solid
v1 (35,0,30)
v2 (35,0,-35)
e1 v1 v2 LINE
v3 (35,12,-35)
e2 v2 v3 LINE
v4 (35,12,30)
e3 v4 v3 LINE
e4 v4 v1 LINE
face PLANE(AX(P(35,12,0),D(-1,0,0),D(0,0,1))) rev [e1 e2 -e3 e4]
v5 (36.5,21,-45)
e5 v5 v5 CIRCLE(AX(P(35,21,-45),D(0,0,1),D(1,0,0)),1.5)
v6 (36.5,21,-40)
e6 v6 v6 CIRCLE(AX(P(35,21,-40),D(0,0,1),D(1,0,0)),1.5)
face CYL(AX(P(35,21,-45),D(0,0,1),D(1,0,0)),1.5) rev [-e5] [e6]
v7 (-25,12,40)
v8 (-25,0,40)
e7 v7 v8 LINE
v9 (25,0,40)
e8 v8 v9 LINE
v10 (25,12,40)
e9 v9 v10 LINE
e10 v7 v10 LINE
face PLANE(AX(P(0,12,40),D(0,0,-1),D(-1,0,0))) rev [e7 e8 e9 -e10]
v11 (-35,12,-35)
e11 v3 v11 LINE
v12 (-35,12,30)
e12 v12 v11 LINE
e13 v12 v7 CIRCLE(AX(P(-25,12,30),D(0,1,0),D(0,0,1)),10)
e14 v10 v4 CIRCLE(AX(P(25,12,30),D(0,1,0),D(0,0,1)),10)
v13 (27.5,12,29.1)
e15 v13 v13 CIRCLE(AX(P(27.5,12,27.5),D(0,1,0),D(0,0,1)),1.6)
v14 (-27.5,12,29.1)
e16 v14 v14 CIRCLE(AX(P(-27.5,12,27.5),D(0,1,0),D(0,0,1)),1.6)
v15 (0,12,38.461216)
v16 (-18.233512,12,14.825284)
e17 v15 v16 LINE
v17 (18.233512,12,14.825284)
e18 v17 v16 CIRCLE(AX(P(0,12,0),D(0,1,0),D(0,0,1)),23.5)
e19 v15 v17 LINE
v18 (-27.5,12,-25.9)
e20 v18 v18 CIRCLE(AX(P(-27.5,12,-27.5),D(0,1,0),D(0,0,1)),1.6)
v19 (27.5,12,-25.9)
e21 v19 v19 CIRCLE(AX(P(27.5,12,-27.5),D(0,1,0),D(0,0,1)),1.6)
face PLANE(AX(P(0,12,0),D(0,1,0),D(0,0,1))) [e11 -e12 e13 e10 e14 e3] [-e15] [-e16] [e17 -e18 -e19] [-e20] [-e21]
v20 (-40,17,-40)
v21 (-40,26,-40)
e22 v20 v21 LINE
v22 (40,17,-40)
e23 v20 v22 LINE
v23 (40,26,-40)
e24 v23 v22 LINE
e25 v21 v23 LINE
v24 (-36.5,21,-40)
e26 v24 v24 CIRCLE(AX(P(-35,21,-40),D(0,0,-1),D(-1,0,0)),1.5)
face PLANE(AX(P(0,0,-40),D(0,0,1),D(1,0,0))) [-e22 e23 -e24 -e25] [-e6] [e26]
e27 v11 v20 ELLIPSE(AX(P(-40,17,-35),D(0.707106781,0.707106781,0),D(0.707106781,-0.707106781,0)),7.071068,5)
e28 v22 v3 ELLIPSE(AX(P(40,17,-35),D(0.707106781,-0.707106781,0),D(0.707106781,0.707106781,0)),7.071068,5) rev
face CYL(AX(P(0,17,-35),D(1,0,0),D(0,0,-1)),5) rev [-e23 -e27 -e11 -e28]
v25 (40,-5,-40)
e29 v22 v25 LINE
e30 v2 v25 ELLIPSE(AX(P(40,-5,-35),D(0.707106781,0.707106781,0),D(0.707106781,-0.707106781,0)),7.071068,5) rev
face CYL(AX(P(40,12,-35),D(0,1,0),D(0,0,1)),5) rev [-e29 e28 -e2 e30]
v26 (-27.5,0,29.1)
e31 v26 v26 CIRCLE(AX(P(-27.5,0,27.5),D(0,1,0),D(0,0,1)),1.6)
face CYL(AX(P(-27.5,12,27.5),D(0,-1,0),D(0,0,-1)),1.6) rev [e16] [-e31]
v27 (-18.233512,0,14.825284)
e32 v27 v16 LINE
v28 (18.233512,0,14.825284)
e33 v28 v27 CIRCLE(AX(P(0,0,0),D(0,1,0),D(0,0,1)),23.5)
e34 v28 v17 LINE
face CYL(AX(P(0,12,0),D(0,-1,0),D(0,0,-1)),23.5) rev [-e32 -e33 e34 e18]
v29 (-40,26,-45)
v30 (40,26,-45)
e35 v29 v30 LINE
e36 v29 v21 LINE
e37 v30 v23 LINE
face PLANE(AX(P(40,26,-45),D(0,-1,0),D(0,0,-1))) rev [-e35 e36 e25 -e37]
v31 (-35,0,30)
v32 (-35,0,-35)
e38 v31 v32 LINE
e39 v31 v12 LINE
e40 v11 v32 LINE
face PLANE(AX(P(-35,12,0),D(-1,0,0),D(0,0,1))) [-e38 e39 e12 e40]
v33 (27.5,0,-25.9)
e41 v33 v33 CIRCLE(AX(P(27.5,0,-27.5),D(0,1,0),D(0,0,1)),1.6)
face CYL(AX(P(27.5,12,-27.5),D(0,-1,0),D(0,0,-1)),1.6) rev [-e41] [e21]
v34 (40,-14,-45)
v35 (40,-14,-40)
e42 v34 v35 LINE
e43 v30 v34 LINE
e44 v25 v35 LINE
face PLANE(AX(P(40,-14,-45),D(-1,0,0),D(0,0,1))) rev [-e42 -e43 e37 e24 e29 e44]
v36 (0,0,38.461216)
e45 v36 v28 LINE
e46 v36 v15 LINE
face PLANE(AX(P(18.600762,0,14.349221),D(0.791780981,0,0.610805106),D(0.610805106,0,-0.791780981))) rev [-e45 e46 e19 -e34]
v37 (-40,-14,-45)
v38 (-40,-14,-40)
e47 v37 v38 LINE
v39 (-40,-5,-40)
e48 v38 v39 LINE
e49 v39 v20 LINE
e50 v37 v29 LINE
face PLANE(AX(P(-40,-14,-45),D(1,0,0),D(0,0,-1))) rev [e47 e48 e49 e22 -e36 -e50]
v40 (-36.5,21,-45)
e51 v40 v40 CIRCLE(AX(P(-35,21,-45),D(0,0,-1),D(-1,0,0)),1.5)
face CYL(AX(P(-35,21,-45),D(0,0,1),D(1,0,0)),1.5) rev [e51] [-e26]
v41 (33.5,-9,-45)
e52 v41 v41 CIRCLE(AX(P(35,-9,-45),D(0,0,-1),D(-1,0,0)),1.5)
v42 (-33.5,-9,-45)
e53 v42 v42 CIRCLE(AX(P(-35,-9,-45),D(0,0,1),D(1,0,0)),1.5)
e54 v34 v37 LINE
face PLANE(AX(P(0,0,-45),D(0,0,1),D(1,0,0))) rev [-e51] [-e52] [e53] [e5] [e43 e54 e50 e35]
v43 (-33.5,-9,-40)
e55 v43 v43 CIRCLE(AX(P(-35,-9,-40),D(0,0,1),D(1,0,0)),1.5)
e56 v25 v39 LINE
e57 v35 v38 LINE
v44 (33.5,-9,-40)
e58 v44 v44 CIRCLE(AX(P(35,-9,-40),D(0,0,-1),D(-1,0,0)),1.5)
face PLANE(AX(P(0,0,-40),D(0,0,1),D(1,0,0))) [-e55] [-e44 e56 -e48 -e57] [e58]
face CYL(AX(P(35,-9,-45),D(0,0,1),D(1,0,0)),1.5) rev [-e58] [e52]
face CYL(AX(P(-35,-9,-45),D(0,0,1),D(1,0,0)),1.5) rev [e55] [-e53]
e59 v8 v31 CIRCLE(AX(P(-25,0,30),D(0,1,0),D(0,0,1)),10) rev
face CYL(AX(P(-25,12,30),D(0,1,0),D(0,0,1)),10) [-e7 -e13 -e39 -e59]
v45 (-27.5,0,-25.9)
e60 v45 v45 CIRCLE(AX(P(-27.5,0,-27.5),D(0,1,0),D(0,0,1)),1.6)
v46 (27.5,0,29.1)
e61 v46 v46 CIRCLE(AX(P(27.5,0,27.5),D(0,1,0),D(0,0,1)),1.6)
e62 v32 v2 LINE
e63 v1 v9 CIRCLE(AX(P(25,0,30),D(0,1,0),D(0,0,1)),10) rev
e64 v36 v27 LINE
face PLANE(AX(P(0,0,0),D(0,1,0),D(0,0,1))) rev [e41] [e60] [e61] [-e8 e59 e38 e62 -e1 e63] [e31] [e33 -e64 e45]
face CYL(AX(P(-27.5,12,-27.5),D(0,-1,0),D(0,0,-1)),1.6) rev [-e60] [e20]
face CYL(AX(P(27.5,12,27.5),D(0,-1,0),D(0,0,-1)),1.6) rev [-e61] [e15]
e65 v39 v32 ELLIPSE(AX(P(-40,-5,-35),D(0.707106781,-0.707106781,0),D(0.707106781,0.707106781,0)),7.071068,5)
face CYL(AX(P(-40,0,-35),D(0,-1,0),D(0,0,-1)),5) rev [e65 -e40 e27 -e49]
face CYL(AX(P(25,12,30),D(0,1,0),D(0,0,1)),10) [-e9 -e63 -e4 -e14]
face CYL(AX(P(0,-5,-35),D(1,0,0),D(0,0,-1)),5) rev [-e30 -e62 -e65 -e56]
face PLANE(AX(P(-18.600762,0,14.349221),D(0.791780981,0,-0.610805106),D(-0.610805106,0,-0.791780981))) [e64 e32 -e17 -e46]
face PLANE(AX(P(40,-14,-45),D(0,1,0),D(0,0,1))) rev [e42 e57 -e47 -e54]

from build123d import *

# Parameters (mm, degrees)
SKETCH_2_W          = 70
SKETCH_2_H          = 80
SKETCH_2_R          = 23.5
SKETCH_2_R_2        = 1.6
EXTRUDE_4_DEPTH     = 12
SKETCH_6_W          = 80
SKETCH_6_H          = 40
EXTRUDE_6_DEPTH     = 5
FILLET_3_R          = 5
FILLET_4_R          = 5
FILLET_5_R          = 5
FILLET_6_R          = 5
SKETCH_7_R          = 1.5
CUT_EXTRUDE_4_DEPTH = 5
CUT_EXTRUDE_START   = -12
CUT_EXTRUDE_6_DEPTH = 12
FILLET_7_R          = 10
FILLET_8_R          = 10


with BuildPart() as part:
    # 草图2 → 凸台-拉伸4 (new body)
    with BuildSketch(Plane(origin=(0, 0, 0), x_dir=(1, 0, 0), z_dir=(0, 1, 0))):
        Rectangle(SKETCH_2_W, SKETCH_2_H)
        with Locations(Location((0, 0, 0), (0, 0, 270))):
            Circle(SKETCH_2_R, mode=Mode.SUBTRACT)
        with Locations(Location((-27.5, 27.5, 0), (0, 0, 270))):
            Circle(SKETCH_2_R_2, mode=Mode.SUBTRACT)
        with Locations(Location((27.5, 27.5, 0), (0, 0, 270))):
            Circle(SKETCH_2_R_2, mode=Mode.SUBTRACT)
        with Locations(Location((27.5, -27.5, 0), (0, 0, 270))):
            Circle(SKETCH_2_R_2, mode=Mode.SUBTRACT)
        with Locations(Location((-27.5, -27.5, 0), (0, 0, 270))):
            Circle(SKETCH_2_R_2, mode=Mode.SUBTRACT)
    extrude(amount=EXTRUDE_4_DEPTH)

    # 草图6 → 凸台-拉伸6 (add)
    with BuildSketch(Plane(origin=(0, 0, -40), x_dir=(-1, 0, 0), z_dir=(0, 0, -1))):
        with Locations((0, 6)):
            Rectangle(SKETCH_6_W, SKETCH_6_H)
    extrude(amount=EXTRUDE_6_DEPTH)

    # 圆角3
    fillet_3_edges = [part.edges().sort_by_distance(p)[0] for p in [
        (0, 12, -40),
    ]]
    fillet(fillet_3_edges, radius=FILLET_3_R)

    # 圆角4
    fillet_4_edges = [part.edges().sort_by_distance(p)[0] for p in [
        (0, 0, -40),
    ]]
    fillet(fillet_4_edges, radius=FILLET_4_R)

    # 圆角5
    fillet_5_edges = [part.edges().sort_by_distance(p)[0] for p in [
        (35, 6, -40),
    ]]
    fillet(fillet_5_edges, radius=FILLET_5_R - 0.0001)  # a hair under: the kernel refuses the full size

    # 圆角6
    fillet_6_edges = [part.edges().sort_by_distance(p)[0] for p in [
        (-35, 6, -40),
    ]]
    fillet(fillet_6_edges, radius=FILLET_6_R - 0.0001)  # a hair under: the kernel refuses the full size

    # 草图7 → 切除-拉伸4 (cut)
    with BuildSketch(Plane.XY.offset(-40)):
        with Locations((-35, -9)):
            Circle(SKETCH_7_R)
        with Locations(Location((-35, 21, 0), (0, 0, 180))):
            Circle(SKETCH_7_R)
        with Locations(Location((35, -9, 0), (0, 0, 180))):
            Circle(SKETCH_7_R)
        with Locations((35, 21)):
            Circle(SKETCH_7_R)
    extrude(amount=-CUT_EXTRUDE_4_DEPTH, mode=Mode.SUBTRACT)

    # 草图8 → 切除-拉伸6 (cut)
    with BuildSketch(Plane(origin=(0, 12, 0), x_dir=(1, 0, 0), z_dir=(0, 1, 0)).offset(CUT_EXTRUDE_START)):
        with BuildLine():
            Line((0, -38.461215902), (0, -23.5))
            ThreePointArc((0, -23.5), (-10.095935407, -21.220793771), (-18.233511761, -14.825284107))
            Line((-18.233511761, -14.825284107), (0, -38.461215902))
        make_face()
        with BuildLine():
            ThreePointArc((18.233511761, -14.825284107), (10.095935407, -21.220793771), (0, -23.5))
            Line((0, -23.5), (0, -38.461215902))
            Line((0, -38.461215902), (18.233511761, -14.825284107))
        make_face()
    extrude(amount=CUT_EXTRUDE_6_DEPTH, mode=Mode.SUBTRACT)

    # 圆角7
    fillet_7_edges = [part.edges().sort_by_distance(p)[0] for p in [
        (-35, 6, 40),
    ]]
    fillet(fillet_7_edges, radius=FILLET_7_R)

    # 圆角8
    fillet_8_edges = [part.edges().sort_by_distance(p)[0] for p in [
        (35, 6, 40),
    ]]
    fillet(fillet_8_edges, radius=FILLET_8_R)


solid = part.part
